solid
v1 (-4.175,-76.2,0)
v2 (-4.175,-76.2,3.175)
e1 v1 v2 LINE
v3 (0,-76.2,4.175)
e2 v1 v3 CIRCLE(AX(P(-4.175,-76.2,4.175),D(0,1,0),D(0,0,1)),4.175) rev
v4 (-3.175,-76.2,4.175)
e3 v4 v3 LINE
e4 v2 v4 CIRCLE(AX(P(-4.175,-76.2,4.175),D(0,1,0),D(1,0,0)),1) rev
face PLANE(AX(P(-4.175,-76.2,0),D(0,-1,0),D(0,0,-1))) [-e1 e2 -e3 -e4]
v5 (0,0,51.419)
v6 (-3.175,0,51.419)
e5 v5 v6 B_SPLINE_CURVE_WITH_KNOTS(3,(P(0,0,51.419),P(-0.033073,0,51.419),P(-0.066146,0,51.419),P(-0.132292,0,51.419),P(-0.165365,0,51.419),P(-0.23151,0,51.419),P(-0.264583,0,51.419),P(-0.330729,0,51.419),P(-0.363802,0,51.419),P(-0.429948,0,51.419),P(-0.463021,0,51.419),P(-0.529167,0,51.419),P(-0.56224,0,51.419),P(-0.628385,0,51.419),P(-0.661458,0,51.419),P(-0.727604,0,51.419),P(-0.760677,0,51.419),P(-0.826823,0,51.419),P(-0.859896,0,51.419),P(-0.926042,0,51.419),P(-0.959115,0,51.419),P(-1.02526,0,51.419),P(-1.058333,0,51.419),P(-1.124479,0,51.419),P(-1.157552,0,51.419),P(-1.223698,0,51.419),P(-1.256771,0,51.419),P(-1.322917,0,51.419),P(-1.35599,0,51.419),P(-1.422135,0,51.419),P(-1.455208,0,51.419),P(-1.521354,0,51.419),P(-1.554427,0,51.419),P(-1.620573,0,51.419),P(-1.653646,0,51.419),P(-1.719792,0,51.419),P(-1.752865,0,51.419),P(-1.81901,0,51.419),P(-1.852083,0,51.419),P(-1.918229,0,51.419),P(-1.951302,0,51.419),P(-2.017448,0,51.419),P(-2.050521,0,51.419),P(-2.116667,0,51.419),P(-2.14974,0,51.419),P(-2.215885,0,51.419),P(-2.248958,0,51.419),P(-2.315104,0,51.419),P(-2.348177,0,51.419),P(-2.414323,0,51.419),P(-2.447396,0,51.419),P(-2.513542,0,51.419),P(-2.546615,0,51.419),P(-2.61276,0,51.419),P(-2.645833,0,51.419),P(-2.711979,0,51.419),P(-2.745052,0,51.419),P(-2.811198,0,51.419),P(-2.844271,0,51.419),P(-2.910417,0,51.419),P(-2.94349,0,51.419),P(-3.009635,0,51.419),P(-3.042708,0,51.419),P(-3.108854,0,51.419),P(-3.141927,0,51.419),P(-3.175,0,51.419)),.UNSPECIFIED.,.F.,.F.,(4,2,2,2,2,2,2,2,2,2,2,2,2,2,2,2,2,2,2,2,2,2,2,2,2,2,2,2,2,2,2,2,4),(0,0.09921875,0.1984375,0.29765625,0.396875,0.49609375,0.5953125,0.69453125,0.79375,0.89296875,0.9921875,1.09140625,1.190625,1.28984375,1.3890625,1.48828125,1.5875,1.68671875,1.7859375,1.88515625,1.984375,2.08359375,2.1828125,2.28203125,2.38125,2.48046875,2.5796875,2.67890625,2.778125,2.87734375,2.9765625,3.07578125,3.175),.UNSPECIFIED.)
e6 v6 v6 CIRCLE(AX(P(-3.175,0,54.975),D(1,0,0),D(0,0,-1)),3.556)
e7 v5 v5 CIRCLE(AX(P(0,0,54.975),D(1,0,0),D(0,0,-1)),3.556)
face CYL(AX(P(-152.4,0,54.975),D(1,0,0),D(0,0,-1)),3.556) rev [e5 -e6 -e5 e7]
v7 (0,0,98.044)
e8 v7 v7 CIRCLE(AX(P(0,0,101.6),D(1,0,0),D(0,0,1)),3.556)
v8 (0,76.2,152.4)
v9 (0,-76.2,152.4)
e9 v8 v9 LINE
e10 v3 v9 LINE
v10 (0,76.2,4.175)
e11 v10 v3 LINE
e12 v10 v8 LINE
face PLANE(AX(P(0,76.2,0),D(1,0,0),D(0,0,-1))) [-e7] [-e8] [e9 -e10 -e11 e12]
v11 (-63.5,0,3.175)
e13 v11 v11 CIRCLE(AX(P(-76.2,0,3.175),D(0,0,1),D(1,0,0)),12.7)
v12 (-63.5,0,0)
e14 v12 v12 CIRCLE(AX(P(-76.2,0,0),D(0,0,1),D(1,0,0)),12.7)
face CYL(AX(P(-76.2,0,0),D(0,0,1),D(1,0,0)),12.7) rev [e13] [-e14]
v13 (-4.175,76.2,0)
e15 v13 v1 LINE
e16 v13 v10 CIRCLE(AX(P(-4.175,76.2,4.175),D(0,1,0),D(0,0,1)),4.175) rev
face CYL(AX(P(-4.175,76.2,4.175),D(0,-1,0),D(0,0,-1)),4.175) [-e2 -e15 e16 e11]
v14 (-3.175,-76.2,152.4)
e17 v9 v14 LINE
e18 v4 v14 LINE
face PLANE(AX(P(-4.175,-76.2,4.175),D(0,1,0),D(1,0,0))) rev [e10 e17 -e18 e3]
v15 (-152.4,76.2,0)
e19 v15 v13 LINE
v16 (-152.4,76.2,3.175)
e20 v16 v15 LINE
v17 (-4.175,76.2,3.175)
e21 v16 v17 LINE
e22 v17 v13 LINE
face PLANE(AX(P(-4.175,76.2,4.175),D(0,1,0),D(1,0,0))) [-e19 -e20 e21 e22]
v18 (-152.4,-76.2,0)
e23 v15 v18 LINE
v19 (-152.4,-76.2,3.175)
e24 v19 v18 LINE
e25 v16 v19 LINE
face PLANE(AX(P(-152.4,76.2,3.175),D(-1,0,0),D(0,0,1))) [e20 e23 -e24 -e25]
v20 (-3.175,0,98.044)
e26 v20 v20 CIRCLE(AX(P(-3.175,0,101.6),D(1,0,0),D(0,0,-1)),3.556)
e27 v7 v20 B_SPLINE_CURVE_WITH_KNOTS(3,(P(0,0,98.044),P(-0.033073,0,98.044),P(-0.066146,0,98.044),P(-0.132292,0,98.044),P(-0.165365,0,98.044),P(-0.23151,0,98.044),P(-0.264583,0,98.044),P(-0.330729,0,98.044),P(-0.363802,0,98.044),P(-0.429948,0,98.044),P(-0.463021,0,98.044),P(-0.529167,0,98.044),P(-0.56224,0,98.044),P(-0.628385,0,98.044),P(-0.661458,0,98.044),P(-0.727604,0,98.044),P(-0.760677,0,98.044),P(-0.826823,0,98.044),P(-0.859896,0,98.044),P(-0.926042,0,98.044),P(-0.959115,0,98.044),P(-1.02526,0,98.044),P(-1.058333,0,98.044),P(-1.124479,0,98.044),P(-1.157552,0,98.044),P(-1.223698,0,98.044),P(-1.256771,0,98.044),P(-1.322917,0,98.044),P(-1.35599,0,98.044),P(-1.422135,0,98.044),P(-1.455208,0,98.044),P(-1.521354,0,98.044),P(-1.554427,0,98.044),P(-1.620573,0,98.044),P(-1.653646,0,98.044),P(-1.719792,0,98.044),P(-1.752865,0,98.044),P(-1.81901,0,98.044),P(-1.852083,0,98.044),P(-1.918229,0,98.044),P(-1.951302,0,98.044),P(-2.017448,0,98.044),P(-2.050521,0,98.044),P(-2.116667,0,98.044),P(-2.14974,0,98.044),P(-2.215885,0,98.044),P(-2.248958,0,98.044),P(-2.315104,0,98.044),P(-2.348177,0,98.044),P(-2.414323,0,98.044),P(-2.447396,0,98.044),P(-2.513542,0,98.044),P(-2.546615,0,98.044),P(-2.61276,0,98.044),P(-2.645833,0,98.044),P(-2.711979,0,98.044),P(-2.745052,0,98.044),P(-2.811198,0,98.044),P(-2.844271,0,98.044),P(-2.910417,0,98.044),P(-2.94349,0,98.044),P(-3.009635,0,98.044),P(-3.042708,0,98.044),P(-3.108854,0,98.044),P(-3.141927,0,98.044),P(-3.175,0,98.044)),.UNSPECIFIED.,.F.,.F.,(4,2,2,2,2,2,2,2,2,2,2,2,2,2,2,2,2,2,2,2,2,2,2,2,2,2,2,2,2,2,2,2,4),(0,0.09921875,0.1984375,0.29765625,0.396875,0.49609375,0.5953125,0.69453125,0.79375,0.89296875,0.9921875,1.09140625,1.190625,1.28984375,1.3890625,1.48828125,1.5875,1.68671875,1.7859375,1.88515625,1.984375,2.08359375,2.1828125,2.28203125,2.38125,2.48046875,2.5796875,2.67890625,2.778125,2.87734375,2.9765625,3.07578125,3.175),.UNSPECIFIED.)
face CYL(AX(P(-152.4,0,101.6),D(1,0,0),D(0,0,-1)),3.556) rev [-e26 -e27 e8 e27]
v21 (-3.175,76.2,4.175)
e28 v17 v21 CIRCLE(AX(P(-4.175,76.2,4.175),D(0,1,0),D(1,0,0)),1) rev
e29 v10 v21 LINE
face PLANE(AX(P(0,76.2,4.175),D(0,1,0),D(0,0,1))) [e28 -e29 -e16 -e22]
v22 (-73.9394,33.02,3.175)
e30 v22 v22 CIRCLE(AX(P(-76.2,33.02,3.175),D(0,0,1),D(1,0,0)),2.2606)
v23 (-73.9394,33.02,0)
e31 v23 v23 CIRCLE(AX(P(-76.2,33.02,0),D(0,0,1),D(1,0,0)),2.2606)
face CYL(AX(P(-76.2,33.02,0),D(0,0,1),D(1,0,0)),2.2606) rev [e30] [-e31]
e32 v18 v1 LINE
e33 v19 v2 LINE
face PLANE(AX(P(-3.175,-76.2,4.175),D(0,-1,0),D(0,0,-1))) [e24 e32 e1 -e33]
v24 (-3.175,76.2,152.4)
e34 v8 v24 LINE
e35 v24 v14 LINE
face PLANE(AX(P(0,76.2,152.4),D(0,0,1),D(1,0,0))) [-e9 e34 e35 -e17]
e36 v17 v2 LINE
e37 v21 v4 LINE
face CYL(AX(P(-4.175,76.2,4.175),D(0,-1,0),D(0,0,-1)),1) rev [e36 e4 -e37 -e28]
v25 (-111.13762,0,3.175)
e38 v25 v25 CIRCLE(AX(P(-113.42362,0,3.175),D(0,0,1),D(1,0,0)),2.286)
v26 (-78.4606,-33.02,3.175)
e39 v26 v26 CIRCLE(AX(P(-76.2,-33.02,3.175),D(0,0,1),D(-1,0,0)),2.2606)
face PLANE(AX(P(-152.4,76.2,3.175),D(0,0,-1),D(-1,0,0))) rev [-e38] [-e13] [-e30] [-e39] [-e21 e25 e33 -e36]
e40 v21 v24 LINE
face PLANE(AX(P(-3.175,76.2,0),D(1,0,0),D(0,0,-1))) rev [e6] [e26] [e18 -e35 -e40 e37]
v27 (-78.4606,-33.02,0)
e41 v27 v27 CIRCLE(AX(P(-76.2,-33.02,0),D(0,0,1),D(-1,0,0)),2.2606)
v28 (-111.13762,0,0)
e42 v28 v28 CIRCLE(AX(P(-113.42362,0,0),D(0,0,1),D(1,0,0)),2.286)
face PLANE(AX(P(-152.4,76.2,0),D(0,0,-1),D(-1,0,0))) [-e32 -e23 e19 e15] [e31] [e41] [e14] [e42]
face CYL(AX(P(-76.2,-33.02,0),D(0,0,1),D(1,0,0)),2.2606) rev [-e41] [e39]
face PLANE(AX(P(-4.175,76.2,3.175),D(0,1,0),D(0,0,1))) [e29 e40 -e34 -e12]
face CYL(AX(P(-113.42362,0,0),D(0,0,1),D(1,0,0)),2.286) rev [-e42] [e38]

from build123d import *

# Parameters (mm, degrees)
BASE_FLANGE1_DEPTH = 76.2
SKETCH6_R          = 12.7
CUT_EXTRUDE1_DEPTH = 227.495696703
SKETCH7_R          = 2.2606
CUT_EXTRUDE2_DEPTH = 227.495696703
SKETCH9_R          = 2.286
CUT_EXTRUDE3_DEPTH = 227.495696703
SKETCH10_R         = 3.556
CUT_EXTRUDE4_DEPTH = 229.6


# Sheet-metal steps are written as plain solids
with BuildPart() as part:
    # Sketch1 → Base-Flange1 (new, symmetric)
    with BuildSketch(Plane(origin=(0, 0, 0), x_dir=(1, 0, 0), z_dir=(0, 1, 0))):
        with BuildLine():
            Line((-152.4, 0), (-4.175, 0))
            ThreePointArc((-4.175, 0), (-1.222829189, -1.222829189), (0, -4.175))
            Line((0, -4.175), (0, -152.4))
            Line((0, -152.4), (-3.175, -152.4))
            Line((-3.175, -152.4), (-3.175, -4.175))
            ThreePointArc((-3.175, -4.175), (-3.467893219, -3.467893219), (-4.175, -3.175))
            Line((-4.175, -3.175), (-152.4, -3.175))
            Line((-152.4, -3.175), (-152.4, 0))
        make_face()
    extrude(amount=BASE_FLANGE1_DEPTH, both=True)

    # Sketch6 → Cut-Extrude1 (cut, through all)
    with BuildSketch(Plane.XY.offset(3.175)):
        with Locations((-76.2, 0)):
            Circle(SKETCH6_R)
    extrude(amount=-CUT_EXTRUDE1_DEPTH, mode=Mode.SUBTRACT)

    # Sketch7 → Cut-Extrude2 (cut, through all)
    with BuildSketch(Plane.XY.offset(3.175)):
        with Locations((-76.2, 33.02)):
            Circle(SKETCH7_R)
        with Locations(Location((-76.2, -33.02, 0), (0, 0, 180))):
            Circle(SKETCH7_R)
    extrude(amount=-CUT_EXTRUDE2_DEPTH, mode=Mode.SUBTRACT)

    # Sketch9 → Cut-Extrude3 (cut, through all)
    with BuildSketch(Plane.XY.offset(3.175)):
        with Locations((-113.42361984, 0)):
            Circle(SKETCH9_R)
    extrude(amount=-CUT_EXTRUDE3_DEPTH, mode=Mode.SUBTRACT)

    # Sketch10 → Cut-Extrude4 (cut, through all)
    with BuildSketch(Plane(origin=(0, 0, 0), x_dir=(0, 0, -1), z_dir=(1, 0, 0))):
        with Locations((-54.975, 0)):
            Circle(SKETCH10_R)
        with Locations((-101.6, 0)):
            Circle(SKETCH10_R)
    extrude(amount=-CUT_EXTRUDE4_DEPTH, mode=Mode.SUBTRACT)


solid = part.part
